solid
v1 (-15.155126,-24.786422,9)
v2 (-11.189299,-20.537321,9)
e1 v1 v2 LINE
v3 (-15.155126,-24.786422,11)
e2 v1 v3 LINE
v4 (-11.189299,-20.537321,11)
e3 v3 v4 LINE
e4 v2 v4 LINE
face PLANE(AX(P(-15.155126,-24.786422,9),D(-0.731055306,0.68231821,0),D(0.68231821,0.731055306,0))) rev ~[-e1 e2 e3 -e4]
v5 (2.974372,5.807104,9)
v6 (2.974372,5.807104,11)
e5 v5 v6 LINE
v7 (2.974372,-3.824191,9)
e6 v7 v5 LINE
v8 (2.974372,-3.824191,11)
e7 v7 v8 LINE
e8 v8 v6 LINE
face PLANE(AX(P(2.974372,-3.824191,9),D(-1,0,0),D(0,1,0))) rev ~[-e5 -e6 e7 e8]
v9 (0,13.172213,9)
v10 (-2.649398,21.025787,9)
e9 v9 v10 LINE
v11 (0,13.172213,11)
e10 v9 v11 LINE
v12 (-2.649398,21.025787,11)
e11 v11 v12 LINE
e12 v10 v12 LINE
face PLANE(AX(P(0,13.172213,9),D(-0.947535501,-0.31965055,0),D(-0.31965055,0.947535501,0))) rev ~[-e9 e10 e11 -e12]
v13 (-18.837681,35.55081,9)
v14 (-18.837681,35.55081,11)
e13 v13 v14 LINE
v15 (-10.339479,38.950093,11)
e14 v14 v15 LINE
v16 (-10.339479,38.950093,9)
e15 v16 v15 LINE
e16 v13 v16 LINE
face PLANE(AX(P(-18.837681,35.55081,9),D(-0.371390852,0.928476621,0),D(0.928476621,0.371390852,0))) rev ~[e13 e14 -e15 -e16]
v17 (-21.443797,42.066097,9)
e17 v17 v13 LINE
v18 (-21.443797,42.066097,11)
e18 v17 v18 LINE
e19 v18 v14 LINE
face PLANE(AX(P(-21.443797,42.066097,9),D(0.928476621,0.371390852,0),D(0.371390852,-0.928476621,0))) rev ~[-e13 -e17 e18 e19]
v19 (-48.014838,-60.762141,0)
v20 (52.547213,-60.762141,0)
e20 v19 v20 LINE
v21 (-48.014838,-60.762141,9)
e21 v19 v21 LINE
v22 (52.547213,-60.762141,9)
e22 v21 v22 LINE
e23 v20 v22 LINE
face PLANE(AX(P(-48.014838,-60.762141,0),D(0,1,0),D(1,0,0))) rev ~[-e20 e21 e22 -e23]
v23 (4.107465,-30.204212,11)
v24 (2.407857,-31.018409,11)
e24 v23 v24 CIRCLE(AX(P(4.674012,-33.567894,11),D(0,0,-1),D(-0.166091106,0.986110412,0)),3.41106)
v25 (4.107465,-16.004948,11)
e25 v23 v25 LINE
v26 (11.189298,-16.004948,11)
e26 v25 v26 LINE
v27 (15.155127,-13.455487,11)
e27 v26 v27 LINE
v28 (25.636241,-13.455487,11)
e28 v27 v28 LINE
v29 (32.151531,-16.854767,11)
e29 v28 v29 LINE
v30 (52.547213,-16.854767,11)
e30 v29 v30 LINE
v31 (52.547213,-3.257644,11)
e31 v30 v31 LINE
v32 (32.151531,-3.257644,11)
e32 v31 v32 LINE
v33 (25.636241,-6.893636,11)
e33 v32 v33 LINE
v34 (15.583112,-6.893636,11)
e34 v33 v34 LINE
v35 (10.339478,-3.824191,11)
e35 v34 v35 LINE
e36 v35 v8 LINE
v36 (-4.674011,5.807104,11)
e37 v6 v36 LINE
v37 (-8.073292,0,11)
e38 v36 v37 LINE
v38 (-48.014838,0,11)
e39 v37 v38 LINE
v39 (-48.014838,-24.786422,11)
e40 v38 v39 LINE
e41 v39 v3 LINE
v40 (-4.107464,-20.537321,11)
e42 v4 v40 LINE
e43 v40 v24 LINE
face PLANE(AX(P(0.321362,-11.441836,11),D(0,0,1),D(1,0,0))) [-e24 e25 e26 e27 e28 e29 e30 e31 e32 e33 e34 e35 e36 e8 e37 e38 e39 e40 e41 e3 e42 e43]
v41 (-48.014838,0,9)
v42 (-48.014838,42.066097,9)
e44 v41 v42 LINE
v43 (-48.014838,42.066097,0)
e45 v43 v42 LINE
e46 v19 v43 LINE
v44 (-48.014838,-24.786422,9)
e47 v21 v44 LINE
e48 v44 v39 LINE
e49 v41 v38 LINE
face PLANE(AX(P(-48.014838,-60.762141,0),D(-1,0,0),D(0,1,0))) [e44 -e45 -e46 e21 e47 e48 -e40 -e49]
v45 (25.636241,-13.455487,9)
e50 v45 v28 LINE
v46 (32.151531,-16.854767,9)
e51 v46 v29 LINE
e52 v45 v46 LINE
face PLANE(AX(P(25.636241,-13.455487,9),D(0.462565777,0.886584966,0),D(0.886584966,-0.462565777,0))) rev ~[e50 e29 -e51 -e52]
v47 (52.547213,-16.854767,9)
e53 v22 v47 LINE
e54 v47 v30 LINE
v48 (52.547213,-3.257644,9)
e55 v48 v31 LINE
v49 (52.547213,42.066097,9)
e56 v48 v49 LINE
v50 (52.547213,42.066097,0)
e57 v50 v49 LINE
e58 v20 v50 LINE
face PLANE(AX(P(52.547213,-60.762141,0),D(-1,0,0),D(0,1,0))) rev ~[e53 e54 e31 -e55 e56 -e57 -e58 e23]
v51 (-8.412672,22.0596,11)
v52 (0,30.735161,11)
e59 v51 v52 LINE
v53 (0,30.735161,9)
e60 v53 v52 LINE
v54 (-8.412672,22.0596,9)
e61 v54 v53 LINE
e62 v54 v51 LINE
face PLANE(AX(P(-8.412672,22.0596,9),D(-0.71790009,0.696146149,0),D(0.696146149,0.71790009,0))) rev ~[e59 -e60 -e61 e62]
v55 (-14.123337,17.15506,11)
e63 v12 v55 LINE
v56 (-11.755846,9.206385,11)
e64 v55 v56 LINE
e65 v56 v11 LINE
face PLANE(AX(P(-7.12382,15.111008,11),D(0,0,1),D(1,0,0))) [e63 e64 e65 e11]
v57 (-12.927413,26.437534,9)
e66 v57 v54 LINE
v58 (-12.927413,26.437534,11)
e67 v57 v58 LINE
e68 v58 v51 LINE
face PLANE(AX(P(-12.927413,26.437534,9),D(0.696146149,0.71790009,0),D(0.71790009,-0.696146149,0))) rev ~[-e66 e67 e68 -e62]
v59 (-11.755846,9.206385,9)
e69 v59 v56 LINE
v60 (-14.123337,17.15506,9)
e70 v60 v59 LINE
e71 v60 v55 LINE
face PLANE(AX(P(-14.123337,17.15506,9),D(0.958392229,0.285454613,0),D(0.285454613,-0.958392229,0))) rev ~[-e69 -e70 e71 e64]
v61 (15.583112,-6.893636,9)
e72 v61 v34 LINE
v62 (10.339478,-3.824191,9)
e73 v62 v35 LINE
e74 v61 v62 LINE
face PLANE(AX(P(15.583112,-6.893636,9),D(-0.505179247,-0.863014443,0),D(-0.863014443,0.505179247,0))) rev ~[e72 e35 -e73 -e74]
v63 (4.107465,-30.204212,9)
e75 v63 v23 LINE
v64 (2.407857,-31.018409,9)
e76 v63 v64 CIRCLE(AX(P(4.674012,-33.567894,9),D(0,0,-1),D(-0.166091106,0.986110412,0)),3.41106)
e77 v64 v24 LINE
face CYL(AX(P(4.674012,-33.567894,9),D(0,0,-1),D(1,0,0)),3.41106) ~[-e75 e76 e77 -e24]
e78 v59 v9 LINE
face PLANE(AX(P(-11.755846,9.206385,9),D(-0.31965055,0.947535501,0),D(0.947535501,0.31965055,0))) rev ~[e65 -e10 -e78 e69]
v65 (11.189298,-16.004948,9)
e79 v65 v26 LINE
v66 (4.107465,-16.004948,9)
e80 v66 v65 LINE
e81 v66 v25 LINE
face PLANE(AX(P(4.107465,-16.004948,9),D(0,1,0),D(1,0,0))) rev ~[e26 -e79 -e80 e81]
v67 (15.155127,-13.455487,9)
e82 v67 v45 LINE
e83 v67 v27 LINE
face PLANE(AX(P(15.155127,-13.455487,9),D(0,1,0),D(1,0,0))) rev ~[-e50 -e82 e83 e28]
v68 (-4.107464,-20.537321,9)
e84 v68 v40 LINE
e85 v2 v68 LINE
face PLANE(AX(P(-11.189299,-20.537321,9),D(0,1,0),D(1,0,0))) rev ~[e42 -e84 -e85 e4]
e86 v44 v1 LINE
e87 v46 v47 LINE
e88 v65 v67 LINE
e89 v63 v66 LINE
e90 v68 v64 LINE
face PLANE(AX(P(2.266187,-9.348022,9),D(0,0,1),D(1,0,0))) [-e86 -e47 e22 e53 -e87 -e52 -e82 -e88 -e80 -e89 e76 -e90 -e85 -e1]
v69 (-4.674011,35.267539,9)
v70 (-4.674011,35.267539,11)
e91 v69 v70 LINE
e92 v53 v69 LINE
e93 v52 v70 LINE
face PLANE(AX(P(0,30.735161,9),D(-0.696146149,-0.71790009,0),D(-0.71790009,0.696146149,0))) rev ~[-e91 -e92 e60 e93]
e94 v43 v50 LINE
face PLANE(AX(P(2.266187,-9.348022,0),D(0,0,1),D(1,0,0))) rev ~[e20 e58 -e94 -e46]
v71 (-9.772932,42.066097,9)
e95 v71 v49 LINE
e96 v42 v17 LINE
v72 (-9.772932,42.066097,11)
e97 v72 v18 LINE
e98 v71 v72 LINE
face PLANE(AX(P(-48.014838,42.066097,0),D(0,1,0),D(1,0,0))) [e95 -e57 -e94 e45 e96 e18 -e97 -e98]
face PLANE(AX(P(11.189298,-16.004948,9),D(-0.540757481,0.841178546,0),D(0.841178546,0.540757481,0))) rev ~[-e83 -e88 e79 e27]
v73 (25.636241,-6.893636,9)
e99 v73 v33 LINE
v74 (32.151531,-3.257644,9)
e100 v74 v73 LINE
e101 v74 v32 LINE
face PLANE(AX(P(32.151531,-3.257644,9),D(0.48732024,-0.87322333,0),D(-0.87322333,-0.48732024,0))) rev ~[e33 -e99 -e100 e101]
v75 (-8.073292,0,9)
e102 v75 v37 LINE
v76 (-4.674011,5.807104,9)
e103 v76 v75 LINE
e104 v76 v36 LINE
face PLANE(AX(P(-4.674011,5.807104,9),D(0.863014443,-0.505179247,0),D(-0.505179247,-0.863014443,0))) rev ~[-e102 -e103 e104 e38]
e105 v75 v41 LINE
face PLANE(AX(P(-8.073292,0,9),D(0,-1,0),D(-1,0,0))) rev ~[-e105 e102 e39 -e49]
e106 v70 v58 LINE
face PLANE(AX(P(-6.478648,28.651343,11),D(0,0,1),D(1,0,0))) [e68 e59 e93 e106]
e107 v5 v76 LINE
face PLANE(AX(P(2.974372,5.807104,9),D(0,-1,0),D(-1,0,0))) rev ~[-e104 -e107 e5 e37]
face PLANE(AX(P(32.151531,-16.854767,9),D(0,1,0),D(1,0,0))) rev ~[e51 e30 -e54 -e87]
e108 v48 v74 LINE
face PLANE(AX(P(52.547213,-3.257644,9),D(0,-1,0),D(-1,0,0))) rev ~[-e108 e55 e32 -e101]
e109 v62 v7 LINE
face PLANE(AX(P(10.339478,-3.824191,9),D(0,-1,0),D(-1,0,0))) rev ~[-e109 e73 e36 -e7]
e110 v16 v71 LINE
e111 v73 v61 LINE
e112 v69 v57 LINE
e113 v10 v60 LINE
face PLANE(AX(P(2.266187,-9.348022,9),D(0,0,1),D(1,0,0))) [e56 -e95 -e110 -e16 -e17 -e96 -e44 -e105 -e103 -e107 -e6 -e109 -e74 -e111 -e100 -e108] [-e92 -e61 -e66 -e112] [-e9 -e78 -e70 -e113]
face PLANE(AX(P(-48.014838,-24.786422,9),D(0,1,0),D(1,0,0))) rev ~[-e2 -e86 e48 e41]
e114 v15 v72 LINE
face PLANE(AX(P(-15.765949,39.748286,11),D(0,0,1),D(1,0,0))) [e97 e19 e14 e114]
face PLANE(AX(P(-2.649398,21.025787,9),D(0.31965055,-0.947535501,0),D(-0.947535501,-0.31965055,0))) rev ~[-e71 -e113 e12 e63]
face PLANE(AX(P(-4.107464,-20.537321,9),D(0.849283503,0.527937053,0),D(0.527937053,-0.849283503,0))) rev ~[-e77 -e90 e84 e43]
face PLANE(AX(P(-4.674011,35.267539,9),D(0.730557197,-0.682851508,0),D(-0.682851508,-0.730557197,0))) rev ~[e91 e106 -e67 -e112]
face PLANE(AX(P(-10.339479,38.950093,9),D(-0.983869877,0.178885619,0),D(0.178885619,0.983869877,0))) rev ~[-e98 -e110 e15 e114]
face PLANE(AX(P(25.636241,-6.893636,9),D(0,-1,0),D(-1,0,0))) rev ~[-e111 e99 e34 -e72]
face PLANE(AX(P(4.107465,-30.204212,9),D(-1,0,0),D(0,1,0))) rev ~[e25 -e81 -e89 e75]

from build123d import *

# Parameters (mm, degrees)
F0_W      = 100.5620509386
F0_H      = 102.8282381594
F1_DEPTH  = 9
F2_R      = 3.4110604721
F3_DEPTH  = 2
F9_DEPTH  = 2
F17_DEPTH = 2
F19_DEPTH = 2
F21_DEPTH = 2


# Not quite as in the source:
# - the program builds the solid bodies; features that only make, move or delete a surface that nothing else refers to are left out


with BuildPart() as f1:
    # F0 (on Top) → F1 (new body)
    with BuildSketch(Plane.XY):
        with Locations((2.2661872208, -9.3480218202)):
            Rectangle(F0_W, F0_H)
    extrude(amount=F1_DEPTH)

    # F2 (on face) → F3 (join)
    with BuildSketch(Plane.XY.offset(9)):
        with Locations((4.6740118414, -33.5678942502)):
            Circle(F2_R)
    extrude(amount=F3_DEPTH)

    # F8 (on face) → F9 (join)
    with BuildSketch(Plane.XY.offset(9)):
        with BuildLine():
            Line((-4.1074641049, -20.5373205245), (2.40785712, -31.0184087486))
            ThreePointArc((2.40785712, -31.0184087486), (3.2003162928, -30.4916050937), (4.1074650362, -30.2042120027))
            Line((4.1074650362, -30.2042120027), (4.1074650362, -16.0049479455))
            Line((4.1074650362, -16.0049479455), (11.1892977729, -16.0049479455))
            Line((11.1892977729, -16.0049479455), (15.155127272, -13.4554868564))
            Line((15.155127272, -13.4554868564), (25.63624084, -13.4554868564))
            Line((25.63624084, -13.4554868564), (32.1515314281, -16.8547667563))
            Line((32.1515314281, -16.8547667563), (52.5472126901, -16.8547667563))
            Line((52.5472126901, -16.8547667563), (52.5472126901, -3.2576438971))
            Line((52.5472126901, -3.2576438971), (32.1515314281, -3.2576438971))
            Line((32.1515314281, -3.2576438971), (25.63624084, -6.8936358156))
            Line((25.63624084, -6.8936358156), (15.5831124042, -6.8936358156))
            Line((15.5831124042, -6.8936358156), (10.3394780308, -3.8241909351))
            Line((10.3394780308, -3.8241909351), (2.9743718915, -3.8241909351))
            Line((2.9743718915, -3.8241909351), (2.9743718915, 5.8071040548))
            Line((2.9743718915, 5.8071040548), (-4.6740109101, 5.8071040548))
            Line((-4.6740109101, 5.8071040548), (-8.0732917413, 0))
            Line((-8.0732917413, 0), (-48.0148382485, 0))
            Line((-48.0148382485, 0), (-48.0148382485, -24.7864220291))
            Line((-48.0148382485, -24.7864220291), (-15.1551263407, -24.7864220291))
            Line((-15.1551263407, -24.7864220291), (-11.1892987043, -20.5373205245))
            Line((-11.1892987043, -20.5373205245), (-4.1074641049, -20.5373205245))
        make_face()
    extrude(amount=F9_DEPTH)

    # F16 (on face) → F17 (join)
    with BuildSketch(Plane.XY.offset(9)):
        Polygon((-14.1233374194, 17.1550600206), (-11.7558455095, 9.2063853517), (0, 13.1722129881), (-2.6493984959, 21.0257866344), align=None)
    extrude(amount=F17_DEPTH)

    # F18 (on face) → F19 (join)
    with BuildSketch(Plane.XY.offset(9)):
        Polygon((0, 30.7351611555), (-4.6740109101, 35.2675393224), (-12.9274129612, 26.4375342768), (-8.4126724433, 22.0596002612), align=None)
    extrude(amount=F19_DEPTH)

    # F20 (on face) → F21 (join)
    with BuildSketch(Plane.XY.offset(9)):
        Polygon((-18.8376810402, 35.5508103967), (-10.3394789621, 38.9500930905), (-9.7729321569, 42.0660972595), (-21.4437972133, 42.0660972595), align=None)
    extrude(amount=F21_DEPTH)


solid = f1.part
